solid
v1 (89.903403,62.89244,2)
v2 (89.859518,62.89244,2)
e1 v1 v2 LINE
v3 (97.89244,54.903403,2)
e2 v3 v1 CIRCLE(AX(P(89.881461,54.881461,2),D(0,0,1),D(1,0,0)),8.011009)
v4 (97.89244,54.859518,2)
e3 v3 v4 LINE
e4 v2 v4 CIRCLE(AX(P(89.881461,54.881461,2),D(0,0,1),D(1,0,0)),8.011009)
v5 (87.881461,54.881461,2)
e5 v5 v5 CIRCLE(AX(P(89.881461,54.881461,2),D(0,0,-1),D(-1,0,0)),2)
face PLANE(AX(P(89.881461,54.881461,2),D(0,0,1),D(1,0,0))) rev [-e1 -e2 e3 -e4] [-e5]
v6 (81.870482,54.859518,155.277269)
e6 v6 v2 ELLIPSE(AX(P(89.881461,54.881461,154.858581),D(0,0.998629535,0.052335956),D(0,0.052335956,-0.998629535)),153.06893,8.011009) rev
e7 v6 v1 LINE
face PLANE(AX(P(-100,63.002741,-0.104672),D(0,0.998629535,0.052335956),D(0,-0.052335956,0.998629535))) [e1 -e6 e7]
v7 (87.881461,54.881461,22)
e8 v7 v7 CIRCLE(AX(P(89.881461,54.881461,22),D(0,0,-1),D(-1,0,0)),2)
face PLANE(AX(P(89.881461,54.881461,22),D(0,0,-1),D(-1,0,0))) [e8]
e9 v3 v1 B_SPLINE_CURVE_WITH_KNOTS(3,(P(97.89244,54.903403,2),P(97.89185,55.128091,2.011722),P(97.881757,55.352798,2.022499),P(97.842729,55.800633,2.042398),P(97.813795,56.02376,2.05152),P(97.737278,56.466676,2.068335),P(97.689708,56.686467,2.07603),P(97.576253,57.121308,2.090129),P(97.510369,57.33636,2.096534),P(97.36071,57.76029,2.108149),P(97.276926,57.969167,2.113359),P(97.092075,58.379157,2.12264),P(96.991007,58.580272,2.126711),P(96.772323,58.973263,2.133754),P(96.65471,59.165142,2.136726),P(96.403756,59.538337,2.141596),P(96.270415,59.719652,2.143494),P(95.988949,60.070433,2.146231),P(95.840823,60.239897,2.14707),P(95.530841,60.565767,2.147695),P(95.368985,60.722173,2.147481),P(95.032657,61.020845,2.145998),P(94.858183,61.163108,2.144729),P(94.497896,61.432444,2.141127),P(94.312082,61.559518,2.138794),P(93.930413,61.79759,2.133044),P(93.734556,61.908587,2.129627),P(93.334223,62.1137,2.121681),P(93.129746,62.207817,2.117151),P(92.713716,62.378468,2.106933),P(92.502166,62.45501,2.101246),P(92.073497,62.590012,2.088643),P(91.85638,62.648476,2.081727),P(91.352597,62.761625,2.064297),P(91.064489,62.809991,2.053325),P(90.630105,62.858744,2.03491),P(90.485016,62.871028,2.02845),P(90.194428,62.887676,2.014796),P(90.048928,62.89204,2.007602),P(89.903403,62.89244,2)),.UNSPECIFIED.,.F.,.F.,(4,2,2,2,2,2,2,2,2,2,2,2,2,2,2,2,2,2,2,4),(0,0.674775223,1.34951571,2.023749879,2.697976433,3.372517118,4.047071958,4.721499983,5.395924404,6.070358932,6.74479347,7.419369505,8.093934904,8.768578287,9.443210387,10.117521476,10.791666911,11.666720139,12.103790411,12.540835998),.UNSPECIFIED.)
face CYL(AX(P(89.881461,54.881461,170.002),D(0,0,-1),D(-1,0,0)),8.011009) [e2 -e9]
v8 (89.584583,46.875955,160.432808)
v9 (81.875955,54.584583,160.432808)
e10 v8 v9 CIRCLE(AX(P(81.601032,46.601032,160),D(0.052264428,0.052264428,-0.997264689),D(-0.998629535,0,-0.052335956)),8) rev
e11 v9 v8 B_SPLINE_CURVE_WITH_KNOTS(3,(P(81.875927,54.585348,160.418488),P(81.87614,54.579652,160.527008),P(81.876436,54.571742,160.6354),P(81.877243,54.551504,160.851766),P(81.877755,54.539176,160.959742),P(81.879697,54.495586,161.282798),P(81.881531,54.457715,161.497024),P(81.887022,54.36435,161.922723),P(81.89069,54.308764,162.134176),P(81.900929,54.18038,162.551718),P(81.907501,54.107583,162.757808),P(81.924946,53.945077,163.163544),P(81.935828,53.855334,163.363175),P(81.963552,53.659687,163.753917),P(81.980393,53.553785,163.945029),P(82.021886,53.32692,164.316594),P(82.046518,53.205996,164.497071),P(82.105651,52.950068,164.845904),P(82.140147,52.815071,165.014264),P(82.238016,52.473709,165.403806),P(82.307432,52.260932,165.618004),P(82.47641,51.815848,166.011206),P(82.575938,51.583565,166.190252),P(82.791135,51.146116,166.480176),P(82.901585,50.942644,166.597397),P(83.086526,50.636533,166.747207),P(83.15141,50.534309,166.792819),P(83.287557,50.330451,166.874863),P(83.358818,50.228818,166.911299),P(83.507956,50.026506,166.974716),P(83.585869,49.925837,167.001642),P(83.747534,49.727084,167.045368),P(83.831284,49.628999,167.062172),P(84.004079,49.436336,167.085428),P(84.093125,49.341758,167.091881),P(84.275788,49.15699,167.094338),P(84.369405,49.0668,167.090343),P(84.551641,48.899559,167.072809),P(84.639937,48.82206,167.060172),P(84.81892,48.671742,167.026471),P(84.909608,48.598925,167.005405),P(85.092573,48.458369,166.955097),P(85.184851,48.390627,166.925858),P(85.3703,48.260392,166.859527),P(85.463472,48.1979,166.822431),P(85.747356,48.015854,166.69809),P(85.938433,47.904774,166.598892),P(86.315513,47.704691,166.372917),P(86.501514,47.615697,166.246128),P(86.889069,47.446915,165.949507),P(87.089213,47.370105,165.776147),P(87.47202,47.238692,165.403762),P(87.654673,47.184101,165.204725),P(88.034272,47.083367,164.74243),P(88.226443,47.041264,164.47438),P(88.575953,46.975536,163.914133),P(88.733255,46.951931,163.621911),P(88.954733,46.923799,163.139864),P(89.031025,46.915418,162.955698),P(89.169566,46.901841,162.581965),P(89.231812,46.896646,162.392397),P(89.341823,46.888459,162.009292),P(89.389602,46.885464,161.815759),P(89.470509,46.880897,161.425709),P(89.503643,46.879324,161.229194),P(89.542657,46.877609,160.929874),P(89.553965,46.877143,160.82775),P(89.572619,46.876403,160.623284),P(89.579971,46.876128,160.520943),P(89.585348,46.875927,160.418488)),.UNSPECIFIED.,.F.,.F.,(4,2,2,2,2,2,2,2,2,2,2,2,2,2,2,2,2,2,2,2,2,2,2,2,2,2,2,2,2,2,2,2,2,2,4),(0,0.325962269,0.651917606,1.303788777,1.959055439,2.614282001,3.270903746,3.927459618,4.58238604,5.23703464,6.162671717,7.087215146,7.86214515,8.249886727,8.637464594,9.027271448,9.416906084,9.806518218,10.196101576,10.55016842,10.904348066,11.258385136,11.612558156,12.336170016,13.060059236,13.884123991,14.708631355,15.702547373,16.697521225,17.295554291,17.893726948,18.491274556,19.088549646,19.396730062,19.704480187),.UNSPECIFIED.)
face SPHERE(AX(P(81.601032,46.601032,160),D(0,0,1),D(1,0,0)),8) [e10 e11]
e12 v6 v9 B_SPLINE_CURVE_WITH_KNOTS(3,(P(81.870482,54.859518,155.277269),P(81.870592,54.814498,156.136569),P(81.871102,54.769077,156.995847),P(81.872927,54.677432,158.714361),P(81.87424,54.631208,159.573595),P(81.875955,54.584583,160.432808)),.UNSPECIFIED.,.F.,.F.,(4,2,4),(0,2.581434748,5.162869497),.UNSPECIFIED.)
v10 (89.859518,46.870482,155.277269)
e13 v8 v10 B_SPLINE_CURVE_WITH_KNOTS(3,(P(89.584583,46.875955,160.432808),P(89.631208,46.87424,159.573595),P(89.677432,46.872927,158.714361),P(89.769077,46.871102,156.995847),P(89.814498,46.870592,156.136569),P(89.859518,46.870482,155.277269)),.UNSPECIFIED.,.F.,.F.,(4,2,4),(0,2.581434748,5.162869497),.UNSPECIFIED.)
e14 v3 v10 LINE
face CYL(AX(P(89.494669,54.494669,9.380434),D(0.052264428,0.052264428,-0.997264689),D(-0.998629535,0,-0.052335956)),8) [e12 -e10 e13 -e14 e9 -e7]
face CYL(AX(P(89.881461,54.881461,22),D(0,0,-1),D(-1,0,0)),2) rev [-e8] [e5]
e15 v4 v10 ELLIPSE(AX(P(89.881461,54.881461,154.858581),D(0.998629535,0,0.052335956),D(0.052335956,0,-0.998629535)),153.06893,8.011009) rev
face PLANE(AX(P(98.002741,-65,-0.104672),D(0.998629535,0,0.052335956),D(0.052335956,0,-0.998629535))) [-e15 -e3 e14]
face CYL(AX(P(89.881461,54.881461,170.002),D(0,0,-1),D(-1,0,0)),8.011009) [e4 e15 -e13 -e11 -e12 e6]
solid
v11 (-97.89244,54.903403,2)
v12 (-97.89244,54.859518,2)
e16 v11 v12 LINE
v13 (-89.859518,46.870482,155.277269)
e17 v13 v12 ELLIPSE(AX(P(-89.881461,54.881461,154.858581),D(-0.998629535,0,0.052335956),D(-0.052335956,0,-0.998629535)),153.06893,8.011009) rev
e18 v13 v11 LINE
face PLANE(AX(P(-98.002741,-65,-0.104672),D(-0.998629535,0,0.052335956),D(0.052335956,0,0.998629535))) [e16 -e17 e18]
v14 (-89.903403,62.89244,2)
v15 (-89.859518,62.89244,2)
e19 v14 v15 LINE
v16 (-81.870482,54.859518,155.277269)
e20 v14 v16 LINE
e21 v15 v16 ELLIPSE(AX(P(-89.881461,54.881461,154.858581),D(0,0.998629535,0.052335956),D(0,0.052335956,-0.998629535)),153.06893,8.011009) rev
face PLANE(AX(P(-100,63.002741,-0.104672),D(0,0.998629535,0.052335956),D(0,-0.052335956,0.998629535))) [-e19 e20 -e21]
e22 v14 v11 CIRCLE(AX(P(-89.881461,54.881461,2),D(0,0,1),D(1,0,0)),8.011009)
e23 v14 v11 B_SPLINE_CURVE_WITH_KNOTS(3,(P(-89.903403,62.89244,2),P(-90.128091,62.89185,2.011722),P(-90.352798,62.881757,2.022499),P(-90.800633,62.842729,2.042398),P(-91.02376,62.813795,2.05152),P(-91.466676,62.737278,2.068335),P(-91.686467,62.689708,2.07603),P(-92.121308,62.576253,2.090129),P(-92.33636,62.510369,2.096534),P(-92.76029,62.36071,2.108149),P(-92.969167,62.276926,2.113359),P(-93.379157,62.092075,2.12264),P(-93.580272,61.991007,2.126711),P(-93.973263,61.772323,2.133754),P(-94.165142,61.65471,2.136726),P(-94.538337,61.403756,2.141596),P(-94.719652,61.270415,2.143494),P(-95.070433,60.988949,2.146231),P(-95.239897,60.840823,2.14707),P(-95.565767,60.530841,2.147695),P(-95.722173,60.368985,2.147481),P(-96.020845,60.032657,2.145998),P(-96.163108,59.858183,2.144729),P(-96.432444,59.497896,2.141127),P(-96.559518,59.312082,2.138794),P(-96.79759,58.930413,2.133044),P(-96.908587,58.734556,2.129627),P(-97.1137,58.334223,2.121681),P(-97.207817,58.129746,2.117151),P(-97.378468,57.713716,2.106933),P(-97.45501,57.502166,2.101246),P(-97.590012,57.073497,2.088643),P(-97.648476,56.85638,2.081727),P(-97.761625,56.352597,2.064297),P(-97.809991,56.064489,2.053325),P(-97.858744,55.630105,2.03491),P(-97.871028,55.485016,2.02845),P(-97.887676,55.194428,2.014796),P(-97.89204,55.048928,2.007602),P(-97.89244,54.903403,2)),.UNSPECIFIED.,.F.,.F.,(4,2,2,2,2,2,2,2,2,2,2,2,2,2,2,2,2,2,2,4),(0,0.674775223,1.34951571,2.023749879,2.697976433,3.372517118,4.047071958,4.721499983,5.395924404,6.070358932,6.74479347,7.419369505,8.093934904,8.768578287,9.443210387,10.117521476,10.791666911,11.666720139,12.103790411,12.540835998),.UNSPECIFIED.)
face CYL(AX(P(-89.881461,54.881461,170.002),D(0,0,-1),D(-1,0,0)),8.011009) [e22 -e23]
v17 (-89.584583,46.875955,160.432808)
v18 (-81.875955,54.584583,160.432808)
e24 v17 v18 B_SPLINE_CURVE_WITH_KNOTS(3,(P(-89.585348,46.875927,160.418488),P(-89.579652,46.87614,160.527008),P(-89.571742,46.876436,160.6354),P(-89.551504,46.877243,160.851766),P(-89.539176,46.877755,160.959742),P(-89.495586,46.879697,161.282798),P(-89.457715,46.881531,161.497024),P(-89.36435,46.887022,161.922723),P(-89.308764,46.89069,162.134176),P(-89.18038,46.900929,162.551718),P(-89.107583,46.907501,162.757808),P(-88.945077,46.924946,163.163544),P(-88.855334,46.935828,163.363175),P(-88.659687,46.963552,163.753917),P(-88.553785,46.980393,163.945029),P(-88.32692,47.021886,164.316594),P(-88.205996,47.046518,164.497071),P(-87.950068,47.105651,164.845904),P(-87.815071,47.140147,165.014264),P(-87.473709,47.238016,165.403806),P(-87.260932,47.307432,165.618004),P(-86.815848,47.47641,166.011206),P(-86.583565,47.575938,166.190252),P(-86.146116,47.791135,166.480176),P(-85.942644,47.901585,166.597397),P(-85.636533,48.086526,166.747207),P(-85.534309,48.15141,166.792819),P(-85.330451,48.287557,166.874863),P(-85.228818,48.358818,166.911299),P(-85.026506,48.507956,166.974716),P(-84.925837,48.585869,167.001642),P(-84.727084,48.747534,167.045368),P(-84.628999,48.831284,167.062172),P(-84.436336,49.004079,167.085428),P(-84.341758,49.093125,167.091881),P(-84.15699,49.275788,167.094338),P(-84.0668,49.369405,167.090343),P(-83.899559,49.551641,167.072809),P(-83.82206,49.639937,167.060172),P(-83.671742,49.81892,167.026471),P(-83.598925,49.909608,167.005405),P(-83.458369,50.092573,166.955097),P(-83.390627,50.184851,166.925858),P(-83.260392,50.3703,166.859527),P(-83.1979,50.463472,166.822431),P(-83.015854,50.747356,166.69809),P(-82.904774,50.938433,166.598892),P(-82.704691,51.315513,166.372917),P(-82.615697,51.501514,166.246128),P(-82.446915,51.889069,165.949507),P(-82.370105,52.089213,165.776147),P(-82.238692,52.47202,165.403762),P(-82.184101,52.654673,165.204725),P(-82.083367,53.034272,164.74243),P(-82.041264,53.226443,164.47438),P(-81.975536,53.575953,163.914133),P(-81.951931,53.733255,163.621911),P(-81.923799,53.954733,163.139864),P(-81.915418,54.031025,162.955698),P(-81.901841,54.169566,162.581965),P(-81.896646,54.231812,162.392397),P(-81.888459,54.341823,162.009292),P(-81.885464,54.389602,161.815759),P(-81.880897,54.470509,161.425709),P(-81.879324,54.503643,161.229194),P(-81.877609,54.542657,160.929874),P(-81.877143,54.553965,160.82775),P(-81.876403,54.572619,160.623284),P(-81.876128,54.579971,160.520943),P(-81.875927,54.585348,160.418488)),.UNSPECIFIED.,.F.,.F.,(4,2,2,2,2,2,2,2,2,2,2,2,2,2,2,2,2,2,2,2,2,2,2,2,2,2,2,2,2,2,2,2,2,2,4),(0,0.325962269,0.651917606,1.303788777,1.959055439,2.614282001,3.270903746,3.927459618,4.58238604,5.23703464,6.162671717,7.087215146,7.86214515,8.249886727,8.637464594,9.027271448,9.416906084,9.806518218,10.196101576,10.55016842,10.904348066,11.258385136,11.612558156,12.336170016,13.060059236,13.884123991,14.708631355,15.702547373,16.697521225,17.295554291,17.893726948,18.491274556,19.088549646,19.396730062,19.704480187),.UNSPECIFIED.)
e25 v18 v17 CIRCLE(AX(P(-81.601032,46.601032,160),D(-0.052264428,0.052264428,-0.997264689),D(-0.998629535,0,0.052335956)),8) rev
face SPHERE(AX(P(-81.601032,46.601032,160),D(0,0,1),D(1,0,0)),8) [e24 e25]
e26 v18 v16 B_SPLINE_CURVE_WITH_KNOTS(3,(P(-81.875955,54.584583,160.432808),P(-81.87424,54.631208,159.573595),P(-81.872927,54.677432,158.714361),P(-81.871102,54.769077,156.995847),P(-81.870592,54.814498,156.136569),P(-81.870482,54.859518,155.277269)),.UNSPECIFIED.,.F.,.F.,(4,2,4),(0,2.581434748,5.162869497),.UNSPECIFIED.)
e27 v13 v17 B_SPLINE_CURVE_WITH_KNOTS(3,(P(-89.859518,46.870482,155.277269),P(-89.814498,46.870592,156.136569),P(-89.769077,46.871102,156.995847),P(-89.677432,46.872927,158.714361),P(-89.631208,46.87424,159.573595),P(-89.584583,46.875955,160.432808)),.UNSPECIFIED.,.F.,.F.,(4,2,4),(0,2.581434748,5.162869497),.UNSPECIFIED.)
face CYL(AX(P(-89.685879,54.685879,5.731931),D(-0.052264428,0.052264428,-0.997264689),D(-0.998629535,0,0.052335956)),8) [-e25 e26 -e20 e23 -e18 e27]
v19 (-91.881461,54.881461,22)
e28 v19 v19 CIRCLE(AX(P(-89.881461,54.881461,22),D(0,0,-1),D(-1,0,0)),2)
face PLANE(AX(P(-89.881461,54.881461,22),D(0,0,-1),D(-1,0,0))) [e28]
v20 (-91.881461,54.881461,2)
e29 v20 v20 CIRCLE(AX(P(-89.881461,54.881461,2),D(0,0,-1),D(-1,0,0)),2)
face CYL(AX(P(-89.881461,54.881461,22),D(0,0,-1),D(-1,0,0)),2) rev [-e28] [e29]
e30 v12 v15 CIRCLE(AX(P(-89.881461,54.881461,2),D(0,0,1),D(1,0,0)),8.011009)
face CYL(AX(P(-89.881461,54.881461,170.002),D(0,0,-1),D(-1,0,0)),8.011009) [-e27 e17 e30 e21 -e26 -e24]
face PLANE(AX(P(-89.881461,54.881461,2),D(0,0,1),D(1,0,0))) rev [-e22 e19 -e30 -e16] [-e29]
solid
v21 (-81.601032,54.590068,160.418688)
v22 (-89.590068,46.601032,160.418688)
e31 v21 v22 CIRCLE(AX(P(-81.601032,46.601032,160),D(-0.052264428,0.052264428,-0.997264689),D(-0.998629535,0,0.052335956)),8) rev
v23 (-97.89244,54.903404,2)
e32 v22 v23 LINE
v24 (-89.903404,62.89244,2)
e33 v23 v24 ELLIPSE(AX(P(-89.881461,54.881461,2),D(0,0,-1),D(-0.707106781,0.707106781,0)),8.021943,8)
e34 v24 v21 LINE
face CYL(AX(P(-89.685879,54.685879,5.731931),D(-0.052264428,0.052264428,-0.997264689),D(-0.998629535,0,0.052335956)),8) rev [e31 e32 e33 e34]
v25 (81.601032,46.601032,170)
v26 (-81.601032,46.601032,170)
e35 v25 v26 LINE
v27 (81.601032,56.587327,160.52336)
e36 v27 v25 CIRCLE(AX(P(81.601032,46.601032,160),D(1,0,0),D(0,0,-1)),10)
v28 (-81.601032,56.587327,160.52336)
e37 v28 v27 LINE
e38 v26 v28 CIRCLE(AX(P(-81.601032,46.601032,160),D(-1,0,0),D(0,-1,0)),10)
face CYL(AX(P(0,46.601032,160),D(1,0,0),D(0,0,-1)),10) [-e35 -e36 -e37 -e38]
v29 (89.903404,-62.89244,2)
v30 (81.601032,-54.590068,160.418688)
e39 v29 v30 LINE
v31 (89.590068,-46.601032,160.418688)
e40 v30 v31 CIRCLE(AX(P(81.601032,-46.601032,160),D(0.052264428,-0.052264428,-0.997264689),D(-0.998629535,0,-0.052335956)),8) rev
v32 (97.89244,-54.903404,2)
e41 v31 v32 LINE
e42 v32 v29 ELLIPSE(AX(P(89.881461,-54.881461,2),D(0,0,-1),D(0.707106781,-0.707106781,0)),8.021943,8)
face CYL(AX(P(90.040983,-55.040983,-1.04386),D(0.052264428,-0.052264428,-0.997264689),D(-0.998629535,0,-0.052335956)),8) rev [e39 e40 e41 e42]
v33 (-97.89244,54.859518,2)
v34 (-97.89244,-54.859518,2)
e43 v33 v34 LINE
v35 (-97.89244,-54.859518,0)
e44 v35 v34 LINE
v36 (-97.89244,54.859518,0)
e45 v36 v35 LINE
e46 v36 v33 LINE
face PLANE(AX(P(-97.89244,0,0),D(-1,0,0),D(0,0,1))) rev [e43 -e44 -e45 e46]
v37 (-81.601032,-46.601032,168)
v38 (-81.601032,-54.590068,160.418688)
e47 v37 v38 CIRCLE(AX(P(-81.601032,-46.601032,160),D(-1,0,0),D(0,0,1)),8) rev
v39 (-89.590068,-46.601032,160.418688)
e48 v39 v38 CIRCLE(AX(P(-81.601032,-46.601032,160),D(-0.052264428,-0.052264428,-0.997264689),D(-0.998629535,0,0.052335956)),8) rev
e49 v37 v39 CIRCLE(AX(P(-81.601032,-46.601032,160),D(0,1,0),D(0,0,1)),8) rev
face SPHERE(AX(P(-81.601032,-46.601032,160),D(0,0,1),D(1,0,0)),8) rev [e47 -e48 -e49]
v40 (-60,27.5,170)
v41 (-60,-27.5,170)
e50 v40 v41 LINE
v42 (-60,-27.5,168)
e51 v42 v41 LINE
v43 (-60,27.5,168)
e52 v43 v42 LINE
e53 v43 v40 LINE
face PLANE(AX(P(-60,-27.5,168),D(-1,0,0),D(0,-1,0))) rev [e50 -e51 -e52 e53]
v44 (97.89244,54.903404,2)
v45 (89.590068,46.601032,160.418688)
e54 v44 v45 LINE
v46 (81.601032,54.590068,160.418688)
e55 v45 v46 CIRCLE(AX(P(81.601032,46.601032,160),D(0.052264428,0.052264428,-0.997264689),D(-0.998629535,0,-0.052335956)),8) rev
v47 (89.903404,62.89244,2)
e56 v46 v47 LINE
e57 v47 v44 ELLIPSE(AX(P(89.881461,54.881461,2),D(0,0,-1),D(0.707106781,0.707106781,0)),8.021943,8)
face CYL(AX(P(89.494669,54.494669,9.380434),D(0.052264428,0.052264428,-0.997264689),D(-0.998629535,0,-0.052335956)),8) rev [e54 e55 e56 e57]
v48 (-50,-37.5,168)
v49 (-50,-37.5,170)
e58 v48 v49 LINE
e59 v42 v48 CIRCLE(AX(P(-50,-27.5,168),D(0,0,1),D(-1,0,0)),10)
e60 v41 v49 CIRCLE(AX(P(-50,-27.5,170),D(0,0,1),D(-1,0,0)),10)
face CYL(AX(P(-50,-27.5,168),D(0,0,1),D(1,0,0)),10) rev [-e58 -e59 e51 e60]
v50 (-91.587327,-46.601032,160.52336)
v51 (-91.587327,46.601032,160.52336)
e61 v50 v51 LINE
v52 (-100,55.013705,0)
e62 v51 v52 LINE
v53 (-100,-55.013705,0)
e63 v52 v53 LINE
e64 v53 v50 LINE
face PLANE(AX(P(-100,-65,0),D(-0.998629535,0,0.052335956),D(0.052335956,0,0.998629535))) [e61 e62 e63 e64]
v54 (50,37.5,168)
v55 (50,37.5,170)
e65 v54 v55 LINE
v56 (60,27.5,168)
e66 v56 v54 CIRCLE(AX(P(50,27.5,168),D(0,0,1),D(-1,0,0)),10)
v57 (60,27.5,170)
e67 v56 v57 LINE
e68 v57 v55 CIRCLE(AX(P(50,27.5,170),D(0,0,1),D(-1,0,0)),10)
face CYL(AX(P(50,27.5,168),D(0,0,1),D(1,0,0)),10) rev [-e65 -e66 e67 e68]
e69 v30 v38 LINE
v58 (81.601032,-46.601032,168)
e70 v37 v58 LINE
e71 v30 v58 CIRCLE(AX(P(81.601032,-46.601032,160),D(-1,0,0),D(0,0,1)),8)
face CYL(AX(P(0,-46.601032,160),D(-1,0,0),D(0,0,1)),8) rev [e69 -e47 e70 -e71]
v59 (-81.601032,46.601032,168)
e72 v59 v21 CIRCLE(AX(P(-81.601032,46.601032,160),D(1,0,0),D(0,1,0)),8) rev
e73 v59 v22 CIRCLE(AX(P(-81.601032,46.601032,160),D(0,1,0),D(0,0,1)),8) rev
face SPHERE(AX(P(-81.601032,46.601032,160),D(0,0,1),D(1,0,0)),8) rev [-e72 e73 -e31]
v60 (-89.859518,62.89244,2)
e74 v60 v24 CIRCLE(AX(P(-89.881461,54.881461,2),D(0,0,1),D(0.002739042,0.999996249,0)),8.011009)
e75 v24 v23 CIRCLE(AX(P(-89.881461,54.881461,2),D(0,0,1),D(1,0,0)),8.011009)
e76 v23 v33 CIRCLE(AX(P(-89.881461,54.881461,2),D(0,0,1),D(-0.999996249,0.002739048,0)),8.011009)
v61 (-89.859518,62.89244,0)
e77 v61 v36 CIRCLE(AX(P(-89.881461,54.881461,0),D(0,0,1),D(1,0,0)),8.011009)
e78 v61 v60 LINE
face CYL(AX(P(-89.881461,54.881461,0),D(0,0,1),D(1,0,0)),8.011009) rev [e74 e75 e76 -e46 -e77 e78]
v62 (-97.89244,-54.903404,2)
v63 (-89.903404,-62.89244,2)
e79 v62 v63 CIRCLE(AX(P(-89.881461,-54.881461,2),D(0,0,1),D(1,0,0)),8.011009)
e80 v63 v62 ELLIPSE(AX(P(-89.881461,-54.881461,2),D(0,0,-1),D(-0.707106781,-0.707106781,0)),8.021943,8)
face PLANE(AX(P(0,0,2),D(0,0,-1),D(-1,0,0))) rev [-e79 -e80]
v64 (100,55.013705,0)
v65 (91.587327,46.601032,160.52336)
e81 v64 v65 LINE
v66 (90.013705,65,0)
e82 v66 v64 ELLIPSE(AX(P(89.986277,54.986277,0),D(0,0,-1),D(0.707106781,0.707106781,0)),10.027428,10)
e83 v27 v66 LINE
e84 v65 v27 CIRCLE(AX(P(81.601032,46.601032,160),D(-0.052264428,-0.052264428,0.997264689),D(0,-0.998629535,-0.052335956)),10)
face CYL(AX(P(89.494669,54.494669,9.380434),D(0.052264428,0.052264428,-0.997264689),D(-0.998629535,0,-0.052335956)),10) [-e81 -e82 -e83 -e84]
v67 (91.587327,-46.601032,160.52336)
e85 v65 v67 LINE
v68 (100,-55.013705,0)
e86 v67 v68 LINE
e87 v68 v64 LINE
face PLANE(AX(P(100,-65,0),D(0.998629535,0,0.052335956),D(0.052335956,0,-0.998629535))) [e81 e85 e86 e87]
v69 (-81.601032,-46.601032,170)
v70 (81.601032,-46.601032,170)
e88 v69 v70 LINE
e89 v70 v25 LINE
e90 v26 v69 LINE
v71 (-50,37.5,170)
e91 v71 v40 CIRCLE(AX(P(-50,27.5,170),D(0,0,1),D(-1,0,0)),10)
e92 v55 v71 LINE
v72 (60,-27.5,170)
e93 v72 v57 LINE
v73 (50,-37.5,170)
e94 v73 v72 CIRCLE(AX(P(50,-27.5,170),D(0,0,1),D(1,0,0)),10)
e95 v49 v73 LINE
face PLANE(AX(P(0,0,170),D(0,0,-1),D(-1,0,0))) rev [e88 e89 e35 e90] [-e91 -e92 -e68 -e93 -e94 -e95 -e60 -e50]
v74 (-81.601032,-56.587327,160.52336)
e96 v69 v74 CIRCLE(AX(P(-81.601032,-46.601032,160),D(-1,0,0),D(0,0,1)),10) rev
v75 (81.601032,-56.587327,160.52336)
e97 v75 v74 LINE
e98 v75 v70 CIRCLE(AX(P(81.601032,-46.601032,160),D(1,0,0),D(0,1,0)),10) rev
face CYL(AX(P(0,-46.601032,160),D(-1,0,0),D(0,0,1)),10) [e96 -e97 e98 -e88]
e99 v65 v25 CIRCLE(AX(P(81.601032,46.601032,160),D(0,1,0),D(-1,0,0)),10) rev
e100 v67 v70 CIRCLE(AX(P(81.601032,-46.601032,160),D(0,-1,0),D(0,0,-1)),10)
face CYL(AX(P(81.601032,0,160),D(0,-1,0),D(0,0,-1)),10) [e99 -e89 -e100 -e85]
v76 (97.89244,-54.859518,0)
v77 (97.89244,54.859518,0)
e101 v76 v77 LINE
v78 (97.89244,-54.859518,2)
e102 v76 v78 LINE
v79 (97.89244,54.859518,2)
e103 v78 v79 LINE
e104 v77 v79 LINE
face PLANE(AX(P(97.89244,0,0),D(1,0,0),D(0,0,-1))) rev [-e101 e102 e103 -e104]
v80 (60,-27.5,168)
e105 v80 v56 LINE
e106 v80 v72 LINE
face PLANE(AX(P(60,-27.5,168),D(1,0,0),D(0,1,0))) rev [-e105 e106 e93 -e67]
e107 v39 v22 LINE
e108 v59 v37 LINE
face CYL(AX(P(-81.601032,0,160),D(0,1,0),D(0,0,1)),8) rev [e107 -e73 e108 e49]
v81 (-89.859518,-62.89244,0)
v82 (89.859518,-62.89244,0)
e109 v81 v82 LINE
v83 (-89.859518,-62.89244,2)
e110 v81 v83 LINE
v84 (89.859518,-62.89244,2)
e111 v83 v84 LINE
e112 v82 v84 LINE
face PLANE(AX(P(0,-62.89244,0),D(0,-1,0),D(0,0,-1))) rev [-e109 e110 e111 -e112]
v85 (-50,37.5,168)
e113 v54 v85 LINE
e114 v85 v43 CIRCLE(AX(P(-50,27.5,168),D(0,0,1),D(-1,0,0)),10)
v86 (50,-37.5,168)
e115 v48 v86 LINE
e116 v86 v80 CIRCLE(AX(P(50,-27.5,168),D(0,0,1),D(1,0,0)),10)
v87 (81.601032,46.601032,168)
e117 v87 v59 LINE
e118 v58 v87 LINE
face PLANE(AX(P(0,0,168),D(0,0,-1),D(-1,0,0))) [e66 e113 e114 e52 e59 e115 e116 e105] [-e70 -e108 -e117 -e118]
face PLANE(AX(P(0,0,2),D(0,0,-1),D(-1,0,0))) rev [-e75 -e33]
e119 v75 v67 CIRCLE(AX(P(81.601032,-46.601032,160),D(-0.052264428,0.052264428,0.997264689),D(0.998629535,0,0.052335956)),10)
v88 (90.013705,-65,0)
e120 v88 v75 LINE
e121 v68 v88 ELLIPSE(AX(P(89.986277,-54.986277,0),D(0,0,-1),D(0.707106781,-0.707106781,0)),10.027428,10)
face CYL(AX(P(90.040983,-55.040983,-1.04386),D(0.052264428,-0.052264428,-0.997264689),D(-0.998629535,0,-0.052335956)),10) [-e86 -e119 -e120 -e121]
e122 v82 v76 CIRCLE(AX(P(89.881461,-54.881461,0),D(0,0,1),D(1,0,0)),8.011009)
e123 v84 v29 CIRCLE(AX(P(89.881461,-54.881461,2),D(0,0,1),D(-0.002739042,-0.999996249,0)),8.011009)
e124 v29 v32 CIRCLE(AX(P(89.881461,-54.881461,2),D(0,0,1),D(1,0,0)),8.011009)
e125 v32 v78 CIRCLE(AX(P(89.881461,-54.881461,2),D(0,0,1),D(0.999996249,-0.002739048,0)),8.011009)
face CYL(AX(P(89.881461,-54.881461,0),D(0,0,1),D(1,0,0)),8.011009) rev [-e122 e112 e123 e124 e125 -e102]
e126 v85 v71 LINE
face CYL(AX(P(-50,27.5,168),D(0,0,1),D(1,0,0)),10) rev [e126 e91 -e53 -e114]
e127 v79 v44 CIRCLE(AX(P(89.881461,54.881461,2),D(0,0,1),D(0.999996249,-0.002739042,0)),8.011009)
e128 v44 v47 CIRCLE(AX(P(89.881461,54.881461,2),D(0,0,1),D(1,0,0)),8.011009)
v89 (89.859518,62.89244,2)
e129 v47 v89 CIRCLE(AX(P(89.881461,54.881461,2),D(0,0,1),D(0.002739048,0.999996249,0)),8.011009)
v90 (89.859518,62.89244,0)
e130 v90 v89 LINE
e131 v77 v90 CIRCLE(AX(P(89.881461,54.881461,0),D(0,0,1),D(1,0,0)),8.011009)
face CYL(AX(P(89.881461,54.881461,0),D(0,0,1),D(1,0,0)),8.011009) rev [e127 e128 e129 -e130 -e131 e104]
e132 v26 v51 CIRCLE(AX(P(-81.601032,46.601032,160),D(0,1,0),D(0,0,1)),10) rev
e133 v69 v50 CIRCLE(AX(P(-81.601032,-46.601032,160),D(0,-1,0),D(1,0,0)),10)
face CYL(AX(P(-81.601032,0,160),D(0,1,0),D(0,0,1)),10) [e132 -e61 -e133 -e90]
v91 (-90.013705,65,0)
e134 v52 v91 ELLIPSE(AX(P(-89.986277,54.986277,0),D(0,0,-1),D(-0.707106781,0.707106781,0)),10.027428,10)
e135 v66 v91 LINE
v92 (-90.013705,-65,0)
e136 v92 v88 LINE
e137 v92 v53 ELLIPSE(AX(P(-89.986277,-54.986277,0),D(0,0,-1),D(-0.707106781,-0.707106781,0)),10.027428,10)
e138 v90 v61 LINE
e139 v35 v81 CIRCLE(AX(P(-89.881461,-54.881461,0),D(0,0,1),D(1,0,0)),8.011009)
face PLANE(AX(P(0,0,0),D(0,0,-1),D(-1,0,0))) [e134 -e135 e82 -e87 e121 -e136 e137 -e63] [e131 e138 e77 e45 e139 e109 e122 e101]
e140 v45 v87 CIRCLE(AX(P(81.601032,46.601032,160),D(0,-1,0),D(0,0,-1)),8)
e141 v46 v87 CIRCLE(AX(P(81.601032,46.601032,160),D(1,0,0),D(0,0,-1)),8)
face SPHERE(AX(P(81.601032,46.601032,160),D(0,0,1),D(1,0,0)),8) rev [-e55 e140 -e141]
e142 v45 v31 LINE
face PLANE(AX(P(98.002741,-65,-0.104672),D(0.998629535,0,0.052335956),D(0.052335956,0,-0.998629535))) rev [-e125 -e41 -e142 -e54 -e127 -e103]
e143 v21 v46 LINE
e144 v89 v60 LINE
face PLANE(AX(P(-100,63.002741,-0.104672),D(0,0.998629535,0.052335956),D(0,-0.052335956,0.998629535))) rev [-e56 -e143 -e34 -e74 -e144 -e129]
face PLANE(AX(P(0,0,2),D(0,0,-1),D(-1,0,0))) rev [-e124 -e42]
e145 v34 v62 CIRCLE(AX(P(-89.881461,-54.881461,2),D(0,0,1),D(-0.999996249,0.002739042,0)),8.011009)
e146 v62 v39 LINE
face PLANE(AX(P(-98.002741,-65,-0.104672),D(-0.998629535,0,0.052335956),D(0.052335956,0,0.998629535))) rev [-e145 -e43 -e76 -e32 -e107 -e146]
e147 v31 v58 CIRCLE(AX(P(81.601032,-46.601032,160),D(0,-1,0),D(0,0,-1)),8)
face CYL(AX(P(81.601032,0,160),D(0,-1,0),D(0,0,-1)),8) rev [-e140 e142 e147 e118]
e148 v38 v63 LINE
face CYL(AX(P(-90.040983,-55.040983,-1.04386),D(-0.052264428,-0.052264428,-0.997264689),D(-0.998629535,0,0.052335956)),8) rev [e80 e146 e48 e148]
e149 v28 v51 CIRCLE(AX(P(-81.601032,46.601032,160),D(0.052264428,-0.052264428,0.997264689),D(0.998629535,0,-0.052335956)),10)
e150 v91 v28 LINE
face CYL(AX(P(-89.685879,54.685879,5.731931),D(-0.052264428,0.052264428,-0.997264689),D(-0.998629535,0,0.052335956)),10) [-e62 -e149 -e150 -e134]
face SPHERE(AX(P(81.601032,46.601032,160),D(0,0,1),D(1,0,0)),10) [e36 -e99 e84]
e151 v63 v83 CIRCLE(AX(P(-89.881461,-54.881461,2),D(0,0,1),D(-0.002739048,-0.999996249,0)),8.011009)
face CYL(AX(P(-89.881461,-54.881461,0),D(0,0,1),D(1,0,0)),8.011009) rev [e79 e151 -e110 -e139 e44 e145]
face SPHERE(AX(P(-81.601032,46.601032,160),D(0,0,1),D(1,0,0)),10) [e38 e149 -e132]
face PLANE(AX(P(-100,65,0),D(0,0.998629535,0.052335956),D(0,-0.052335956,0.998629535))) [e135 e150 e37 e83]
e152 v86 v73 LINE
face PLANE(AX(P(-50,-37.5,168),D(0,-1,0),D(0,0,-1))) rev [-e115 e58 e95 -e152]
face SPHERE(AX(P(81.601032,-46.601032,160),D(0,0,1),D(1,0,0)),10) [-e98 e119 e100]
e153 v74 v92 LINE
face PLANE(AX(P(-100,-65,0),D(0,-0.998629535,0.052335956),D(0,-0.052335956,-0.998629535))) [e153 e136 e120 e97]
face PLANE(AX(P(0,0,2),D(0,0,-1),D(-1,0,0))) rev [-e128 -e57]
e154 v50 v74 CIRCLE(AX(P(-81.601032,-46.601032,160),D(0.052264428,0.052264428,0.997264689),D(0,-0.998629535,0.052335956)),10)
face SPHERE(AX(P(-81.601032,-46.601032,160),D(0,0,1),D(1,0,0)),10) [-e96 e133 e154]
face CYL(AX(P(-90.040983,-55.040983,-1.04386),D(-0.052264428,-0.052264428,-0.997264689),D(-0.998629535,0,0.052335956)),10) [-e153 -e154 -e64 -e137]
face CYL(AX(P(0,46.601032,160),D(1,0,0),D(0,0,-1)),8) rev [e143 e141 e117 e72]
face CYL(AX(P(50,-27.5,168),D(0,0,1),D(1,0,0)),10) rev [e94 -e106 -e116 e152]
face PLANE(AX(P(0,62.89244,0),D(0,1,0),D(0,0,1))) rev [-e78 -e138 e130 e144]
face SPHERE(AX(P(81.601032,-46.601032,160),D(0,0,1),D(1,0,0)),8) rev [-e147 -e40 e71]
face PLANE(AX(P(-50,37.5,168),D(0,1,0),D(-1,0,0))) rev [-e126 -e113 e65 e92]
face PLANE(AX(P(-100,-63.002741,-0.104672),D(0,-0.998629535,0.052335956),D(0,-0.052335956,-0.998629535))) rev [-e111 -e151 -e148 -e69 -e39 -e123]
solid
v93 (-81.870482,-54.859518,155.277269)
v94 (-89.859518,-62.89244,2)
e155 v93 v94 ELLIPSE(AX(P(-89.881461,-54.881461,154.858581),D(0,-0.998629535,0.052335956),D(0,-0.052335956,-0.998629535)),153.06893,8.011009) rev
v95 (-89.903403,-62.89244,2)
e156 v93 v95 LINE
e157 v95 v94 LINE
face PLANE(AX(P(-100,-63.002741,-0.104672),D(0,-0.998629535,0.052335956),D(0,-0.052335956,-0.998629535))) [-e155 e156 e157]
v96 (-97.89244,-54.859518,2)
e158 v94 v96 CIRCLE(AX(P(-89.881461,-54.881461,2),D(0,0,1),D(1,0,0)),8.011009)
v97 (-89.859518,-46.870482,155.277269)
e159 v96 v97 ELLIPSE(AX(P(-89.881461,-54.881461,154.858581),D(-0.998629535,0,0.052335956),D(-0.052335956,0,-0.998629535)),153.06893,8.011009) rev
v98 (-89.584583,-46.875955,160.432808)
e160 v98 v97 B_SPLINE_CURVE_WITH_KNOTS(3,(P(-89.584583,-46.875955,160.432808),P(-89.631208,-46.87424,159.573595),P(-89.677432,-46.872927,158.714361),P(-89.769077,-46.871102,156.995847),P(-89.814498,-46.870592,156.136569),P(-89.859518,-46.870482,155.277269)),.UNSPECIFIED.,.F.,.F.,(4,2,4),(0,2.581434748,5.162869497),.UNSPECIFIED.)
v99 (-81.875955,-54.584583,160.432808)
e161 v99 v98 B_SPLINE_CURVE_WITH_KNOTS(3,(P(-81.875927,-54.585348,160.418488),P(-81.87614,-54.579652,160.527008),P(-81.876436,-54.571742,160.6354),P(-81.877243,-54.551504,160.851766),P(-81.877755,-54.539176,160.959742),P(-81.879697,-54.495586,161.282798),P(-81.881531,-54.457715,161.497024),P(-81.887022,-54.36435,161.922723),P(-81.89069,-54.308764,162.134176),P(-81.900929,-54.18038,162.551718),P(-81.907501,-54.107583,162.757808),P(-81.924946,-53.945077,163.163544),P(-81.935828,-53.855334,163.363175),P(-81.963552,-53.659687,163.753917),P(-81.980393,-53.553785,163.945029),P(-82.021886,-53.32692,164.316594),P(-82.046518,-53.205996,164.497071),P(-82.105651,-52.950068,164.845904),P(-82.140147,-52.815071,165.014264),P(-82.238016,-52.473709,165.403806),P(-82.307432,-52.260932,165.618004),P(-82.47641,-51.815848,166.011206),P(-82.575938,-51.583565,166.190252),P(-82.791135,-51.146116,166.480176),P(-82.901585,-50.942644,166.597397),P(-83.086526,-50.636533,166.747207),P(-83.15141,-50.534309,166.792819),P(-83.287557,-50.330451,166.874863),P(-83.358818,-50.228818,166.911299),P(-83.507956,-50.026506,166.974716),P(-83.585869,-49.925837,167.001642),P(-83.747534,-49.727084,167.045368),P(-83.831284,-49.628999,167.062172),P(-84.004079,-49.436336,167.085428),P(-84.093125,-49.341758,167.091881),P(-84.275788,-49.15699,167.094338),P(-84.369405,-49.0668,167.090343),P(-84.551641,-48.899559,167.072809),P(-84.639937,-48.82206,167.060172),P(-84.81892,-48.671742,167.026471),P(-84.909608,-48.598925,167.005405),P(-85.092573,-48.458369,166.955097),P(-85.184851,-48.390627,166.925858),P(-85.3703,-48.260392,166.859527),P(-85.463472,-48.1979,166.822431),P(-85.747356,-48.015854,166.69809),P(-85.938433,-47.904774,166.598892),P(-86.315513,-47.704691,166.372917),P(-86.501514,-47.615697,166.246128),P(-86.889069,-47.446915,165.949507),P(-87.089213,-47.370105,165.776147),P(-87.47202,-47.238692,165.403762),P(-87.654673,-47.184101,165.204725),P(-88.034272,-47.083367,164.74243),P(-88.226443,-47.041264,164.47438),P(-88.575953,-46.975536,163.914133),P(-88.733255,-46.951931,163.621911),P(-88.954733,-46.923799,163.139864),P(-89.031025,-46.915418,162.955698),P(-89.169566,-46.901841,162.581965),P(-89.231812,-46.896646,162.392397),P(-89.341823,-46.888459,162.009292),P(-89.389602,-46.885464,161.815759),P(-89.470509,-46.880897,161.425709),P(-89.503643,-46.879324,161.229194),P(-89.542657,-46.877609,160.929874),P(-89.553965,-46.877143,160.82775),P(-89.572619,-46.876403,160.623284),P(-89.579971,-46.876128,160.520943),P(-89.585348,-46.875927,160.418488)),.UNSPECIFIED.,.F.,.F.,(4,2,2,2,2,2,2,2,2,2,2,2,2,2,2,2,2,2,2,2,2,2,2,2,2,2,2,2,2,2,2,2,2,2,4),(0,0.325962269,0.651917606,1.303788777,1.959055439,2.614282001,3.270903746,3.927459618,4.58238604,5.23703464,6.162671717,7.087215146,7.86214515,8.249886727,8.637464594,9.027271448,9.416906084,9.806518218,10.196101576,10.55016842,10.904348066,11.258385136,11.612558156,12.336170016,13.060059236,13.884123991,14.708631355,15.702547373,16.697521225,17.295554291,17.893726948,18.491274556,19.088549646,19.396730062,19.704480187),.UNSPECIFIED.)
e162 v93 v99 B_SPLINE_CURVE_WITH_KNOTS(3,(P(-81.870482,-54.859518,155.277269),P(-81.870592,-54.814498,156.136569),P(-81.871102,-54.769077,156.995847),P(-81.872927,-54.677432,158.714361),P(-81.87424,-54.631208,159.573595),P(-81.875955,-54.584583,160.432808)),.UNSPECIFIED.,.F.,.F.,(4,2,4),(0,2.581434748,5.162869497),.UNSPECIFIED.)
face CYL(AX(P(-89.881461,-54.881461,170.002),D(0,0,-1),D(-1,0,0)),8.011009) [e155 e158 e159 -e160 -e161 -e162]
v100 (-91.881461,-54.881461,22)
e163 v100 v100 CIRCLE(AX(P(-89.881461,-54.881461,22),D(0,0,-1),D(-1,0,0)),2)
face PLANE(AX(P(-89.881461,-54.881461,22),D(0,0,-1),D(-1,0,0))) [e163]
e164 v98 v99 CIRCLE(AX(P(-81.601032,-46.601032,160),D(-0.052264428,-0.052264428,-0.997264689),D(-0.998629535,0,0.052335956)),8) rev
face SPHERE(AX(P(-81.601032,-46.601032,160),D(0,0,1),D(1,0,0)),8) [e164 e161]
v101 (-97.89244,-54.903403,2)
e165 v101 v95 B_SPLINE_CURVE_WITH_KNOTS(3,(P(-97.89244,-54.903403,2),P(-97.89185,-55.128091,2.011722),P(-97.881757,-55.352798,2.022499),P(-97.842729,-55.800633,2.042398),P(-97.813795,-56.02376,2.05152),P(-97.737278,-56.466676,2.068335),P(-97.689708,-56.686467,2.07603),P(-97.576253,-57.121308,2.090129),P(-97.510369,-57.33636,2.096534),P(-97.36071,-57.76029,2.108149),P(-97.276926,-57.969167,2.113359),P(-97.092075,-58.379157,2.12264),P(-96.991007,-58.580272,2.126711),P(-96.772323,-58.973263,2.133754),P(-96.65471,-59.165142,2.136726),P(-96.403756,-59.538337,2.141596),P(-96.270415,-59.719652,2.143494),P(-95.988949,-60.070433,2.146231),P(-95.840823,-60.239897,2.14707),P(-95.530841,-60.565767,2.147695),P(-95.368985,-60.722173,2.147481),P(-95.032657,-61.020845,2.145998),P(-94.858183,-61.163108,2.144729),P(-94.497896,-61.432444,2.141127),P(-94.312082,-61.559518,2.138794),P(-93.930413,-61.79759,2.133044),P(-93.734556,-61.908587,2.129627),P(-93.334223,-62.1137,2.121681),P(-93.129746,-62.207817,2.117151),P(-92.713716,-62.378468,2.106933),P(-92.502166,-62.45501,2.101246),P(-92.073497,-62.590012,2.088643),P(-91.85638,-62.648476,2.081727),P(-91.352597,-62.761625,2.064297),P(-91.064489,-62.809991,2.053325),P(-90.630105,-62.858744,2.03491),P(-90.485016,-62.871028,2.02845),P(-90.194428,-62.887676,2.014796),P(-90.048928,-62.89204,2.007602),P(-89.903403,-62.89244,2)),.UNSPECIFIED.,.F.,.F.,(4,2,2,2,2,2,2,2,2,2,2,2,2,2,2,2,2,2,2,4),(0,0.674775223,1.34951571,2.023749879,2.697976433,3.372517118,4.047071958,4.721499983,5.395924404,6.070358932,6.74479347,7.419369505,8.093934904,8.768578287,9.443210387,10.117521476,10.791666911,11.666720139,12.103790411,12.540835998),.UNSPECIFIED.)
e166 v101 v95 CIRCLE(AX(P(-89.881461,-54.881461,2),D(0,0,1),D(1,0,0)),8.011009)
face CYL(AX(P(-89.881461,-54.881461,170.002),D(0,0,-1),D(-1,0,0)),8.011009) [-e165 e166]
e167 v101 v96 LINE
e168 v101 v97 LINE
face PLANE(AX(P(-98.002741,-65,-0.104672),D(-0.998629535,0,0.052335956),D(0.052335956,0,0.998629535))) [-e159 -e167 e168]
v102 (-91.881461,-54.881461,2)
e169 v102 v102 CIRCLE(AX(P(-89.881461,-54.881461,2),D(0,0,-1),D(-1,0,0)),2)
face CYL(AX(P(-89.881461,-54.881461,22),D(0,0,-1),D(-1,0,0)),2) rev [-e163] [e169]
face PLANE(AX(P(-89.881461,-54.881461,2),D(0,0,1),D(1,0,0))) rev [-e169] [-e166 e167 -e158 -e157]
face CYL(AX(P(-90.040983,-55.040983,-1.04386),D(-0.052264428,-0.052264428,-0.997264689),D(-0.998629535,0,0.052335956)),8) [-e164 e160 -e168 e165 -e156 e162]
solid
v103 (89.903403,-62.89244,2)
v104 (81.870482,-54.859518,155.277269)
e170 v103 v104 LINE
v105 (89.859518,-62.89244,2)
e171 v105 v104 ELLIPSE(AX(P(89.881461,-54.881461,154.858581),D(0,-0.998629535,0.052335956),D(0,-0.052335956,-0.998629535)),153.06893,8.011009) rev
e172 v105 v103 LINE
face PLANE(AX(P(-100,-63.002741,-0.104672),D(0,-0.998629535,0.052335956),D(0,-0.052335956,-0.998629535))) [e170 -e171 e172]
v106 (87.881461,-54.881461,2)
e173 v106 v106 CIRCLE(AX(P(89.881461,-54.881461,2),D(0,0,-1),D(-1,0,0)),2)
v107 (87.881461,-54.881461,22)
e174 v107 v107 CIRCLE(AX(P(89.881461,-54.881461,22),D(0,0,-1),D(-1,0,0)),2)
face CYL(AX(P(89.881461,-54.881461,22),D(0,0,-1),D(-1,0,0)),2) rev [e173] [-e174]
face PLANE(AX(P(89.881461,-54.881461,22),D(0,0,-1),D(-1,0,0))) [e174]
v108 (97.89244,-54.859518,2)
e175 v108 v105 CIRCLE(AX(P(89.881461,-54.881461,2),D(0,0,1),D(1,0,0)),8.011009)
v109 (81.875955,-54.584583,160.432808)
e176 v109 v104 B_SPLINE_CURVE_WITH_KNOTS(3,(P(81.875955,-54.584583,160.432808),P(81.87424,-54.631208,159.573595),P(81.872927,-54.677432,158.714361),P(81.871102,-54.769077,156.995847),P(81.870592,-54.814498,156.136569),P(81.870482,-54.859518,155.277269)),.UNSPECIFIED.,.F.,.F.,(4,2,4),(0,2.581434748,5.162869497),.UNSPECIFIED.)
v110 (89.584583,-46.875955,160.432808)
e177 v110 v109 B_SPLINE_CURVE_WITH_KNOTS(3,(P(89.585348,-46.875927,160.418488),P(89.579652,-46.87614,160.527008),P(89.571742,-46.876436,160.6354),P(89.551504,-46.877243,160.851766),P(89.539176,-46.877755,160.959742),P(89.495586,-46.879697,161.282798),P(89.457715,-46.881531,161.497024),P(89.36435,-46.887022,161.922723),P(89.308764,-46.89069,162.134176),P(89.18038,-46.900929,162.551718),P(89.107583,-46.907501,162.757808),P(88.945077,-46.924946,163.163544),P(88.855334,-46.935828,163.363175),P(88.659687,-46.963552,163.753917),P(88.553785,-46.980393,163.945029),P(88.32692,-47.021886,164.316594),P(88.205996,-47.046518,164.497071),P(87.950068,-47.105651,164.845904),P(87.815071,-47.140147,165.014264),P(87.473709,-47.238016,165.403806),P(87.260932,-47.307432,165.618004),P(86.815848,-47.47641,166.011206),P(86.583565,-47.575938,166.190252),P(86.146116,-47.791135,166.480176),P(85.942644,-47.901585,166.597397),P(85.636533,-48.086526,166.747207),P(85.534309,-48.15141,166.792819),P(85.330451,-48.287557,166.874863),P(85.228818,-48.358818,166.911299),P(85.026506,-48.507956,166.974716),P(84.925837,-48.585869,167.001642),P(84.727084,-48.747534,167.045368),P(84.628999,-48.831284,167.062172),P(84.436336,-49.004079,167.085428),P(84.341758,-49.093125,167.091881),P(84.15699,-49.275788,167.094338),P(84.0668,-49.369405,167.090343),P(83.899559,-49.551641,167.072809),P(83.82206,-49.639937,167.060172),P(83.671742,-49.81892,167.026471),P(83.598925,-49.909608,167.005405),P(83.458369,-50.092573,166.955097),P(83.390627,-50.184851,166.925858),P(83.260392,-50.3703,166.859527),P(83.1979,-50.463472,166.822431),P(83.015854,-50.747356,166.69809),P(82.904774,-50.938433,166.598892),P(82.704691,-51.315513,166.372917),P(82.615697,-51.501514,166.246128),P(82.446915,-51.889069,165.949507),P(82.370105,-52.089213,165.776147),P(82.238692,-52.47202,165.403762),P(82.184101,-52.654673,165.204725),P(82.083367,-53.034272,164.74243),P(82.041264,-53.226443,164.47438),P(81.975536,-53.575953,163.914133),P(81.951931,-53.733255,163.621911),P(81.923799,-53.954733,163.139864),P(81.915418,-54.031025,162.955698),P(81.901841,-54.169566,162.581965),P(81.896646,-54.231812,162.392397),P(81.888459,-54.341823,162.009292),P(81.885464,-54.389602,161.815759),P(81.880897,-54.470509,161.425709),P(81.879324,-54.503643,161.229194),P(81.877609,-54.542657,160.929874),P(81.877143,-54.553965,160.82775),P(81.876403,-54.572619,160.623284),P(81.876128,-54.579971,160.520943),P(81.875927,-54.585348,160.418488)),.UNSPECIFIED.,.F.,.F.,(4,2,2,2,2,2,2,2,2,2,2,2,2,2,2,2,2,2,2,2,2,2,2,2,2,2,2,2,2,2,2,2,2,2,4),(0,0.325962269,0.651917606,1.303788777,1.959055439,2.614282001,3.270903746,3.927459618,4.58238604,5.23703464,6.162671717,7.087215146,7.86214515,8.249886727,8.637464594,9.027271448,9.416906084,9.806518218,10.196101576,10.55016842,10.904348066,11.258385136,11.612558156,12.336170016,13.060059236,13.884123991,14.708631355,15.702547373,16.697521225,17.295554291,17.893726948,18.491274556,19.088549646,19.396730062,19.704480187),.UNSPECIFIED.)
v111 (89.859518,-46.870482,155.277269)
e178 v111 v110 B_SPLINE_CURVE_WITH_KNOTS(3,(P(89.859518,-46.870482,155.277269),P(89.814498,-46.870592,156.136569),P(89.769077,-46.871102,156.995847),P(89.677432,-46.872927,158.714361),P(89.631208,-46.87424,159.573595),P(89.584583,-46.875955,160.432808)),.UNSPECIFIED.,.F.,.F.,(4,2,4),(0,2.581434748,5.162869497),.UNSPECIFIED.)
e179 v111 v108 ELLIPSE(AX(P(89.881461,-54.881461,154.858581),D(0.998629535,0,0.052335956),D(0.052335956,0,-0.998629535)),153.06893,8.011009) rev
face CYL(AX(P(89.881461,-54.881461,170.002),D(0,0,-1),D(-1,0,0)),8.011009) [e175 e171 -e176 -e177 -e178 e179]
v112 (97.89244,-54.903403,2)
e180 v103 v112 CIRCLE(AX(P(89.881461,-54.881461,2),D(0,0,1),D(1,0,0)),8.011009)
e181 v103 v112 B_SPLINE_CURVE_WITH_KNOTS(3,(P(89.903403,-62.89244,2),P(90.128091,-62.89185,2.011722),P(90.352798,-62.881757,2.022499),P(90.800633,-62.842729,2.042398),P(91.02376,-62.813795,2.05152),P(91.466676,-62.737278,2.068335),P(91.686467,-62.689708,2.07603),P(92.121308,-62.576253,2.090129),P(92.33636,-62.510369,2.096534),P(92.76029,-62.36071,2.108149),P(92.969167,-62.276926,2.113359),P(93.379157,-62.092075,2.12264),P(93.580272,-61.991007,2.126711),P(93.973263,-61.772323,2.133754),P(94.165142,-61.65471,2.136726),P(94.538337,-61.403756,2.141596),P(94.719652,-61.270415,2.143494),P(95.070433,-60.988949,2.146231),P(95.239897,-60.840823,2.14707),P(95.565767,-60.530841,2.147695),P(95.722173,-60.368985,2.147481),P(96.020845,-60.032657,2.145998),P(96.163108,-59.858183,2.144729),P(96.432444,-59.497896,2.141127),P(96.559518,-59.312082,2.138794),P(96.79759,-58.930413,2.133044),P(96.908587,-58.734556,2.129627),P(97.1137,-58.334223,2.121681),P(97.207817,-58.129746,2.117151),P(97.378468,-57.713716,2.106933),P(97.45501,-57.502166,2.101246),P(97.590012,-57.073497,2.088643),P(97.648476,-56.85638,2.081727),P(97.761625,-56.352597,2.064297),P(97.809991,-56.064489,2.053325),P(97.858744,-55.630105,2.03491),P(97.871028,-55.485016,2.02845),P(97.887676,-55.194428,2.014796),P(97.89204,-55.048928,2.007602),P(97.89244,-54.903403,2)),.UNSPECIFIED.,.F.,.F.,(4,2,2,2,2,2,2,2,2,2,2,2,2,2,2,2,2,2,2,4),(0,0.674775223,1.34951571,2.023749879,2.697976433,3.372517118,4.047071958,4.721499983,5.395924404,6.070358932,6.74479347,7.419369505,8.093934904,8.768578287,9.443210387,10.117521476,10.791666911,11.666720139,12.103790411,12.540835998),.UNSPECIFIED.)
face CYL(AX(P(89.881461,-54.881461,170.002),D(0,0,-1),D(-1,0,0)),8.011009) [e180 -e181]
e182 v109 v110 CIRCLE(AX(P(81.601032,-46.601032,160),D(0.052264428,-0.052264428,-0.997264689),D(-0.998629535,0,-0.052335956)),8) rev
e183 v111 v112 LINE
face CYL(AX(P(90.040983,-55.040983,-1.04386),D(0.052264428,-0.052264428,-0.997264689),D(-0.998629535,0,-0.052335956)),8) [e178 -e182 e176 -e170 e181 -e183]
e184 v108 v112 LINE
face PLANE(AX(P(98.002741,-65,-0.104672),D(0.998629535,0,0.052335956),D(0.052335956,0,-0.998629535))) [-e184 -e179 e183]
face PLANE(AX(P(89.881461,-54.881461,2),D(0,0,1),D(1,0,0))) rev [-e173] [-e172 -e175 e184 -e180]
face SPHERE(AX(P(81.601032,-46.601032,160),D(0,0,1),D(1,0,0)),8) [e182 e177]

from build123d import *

# Parameters (mm, degrees)
SKIZZE1_W                       = 200
SKIZZE1_H                       = 130
AUFSATZ_LINEAR_AUSTRAGEN1_DEPTH = 170
AUFSATZ_LINEAR_AUSTRAGEN1_TAPER = 3
VERRUNDUNG1_R                   = 10
WANDUNG3_T                      = 2
SCHNITT_LINEAR_AUSTRAGEN1_DEPTH = 2
AUFSATZ_LINEAR_AUSTRAGEN2_REACH = 208.032
SKIZZE4_R                       = 8.011008819
SCHNITT_LINEAR_START            = -2
SCHNITT_LINEAR_AUSTRAGEN2_DEPTH = 2
SKIZZE4_5_R                     = 8.011008819
SCHNITT_LINEAR_AUSTRAGEN3_DEPTH = 2
SKIZZE7_R                       = 2
SCHNITT_LINEAR_AUSTRAGEN4_DEPTH = 20


# Read off the part's stored shape, not the designer's step: Schnitt-Linear austragen2
with BuildPart() as part:
    # Skizze1 → Aufsatz-Linear austragen1 (new body)
    with BuildSketch(Plane.XY):
        Rectangle(SKIZZE1_W, SKIZZE1_H)
    extrude(amount=AUFSATZ_LINEAR_AUSTRAGEN1_DEPTH, taper=AUFSATZ_LINEAR_AUSTRAGEN1_TAPER)

    # Verrundung1
    verrundung1_edges = [part.edges().sort_by_distance(p)[0] for p in [
        (-91.090677522, 0, 170),
        (0, -56.090677522, 170),
        (91.090677522, 0, 170),
        (95.545338761, -60.545338761, 85),
        (-95.545338761, -60.545338761, 85),
        (-95.545338761, 60.545338761, 85),
        (95.545338761, 60.545338761, 85),
        (0, 56.090677522, 170),
    ]]
    fillet(verrundung1_edges, radius=VERRUNDUNG1_R)

    # Wandung3 (no face opened: a closed hollow body)
    add(offset(amount=-WANDUNG3_T, mode=Mode.PRIVATE), mode=Mode.SUBTRACT)

    # Skizze2 → Schnitt-Linear austragen1 (cut)
    with BuildSketch(Plane.XY.offset(170)):
        with BuildLine():
            Line((-50, -37.5), (50, -37.5))
            ThreePointArc((50, -37.5), (57.071067812, -34.571067812), (60, -27.5))
            Line((60, -27.5), (60, 27.5))
            ThreePointArc((60, 27.5), (57.071067812, 34.571067812), (50, 37.5))
            Line((50, 37.5), (-50, 37.5))
            ThreePointArc((-50, 37.5), (-57.071067812, 34.571067812), (-60, 27.5))
            Line((-60, 27.5), (-60, -27.5))
            ThreePointArc((-60, -27.5), (-57.071067812, -34.571067812), (-50, -37.5))
        make_face()
    extrude(amount=-SCHNITT_LINEAR_AUSTRAGEN1_DEPTH, mode=Mode.SUBTRACT)


with BuildPart() as body_2:

    # Skizze4 → Aufsatz-Linear austragen2 (new, up to next)
    with BuildSketch(Plane.XY.offset(2), mode=Mode.PRIVATE) as aufsatz_linear_austragen2_sk1:
        with Locations((-89.881460981, 54.881460981)):
            Circle(SKIZZE4_R)
    aufsatz_linear_austragen2_tool1 = extrude(aufsatz_linear_austragen2_sk1.sketch, amount=AUFSATZ_LINEAR_AUSTRAGEN2_REACH, mode=Mode.PRIVATE) - part.part
    # Skizze4 → Aufsatz-Linear austragen2 (new, up to next)
    with BuildSketch(Plane.XY.offset(2), mode=Mode.PRIVATE) as aufsatz_linear_austragen2_sk2:
        with Locations((89.881460981, 54.881460981)):
            Circle(SKIZZE4_R)
    aufsatz_linear_austragen2_tool2 = extrude(aufsatz_linear_austragen2_sk2.sketch, amount=AUFSATZ_LINEAR_AUSTRAGEN2_REACH, mode=Mode.PRIVATE) - part.part
    # Skizze4 → Aufsatz-Linear austragen2 (new, up to next)
    with BuildSketch(Plane.XY.offset(2), mode=Mode.PRIVATE) as aufsatz_linear_austragen2_sk3:
        with Locations((89.881460981, -54.881460981)):
            Circle(SKIZZE4_R)
    aufsatz_linear_austragen2_tool3 = extrude(aufsatz_linear_austragen2_sk3.sketch, amount=AUFSATZ_LINEAR_AUSTRAGEN2_REACH, mode=Mode.PRIVATE) - part.part
    # Skizze4 → Aufsatz-Linear austragen2 (new, up to next)
    with BuildSketch(Plane.XY.offset(2), mode=Mode.PRIVATE) as aufsatz_linear_austragen2_sk4:
        with Locations((-89.881460981, -54.881460981)):
            Circle(SKIZZE4_R)
    aufsatz_linear_austragen2_tool4 = extrude(aufsatz_linear_austragen2_sk4.sketch, amount=AUFSATZ_LINEAR_AUSTRAGEN2_REACH, mode=Mode.PRIVATE) - part.part
    add(aufsatz_linear_austragen2_tool1.solids().sort_by_distance((-89.881461, 54.881461, 2))[0])
    add(aufsatz_linear_austragen2_tool2.solids().sort_by_distance((89.881461, 54.881461, 2))[0])
    add(aufsatz_linear_austragen2_tool3.solids().sort_by_distance((89.881461, -54.881461, 2))[0])
    add(aufsatz_linear_austragen2_tool4.solids().sort_by_distance((-89.881461, -54.881461, 2))[0])

    # Skizze7 → Schnitt-Linear austragen4 (cut)
    with BuildSketch(Plane(origin=(0, 0, 2), x_dir=(-1, 0, 0), z_dir=(0, 0, -1))):
        with Locations((-89.881460981, 54.881460981)):
            Circle(SKIZZE7_R)
        with Locations((89.881460981, 54.881460981)):
            Circle(SKIZZE7_R)
        with Locations((89.881460981, -54.881460981)):
            Circle(SKIZZE7_R)
        with Locations((-89.881460981, -54.881460981)):
            Circle(SKIZZE7_R)
    extrude(amount=-SCHNITT_LINEAR_AUSTRAGEN4_DEPTH, mode=Mode.SUBTRACT)


with BuildPart() as part_1:
    add(part.part)

    # Schnitt-Linear austragen2 outline → Schnitt-Linear austragen2 (cut)
    with BuildSketch(Plane.XY.offset(2).offset(SCHNITT_LINEAR_START)):
        with BuildLine():
            ThreePointArc((-97.892439749, -54.859518492), (-84.216822322, -49.216822322), (-89.859518492, -62.892439749))
            Line((-89.859518492, -62.892439749), (89.859518492, -62.892439749))
            ThreePointArc((89.859518492, -62.892439749), (84.216822322, -49.216822322), (97.892439749, -54.859518492))
            Line((97.892439749, -54.859518492), (97.892439749, 54.859518492))
            ThreePointArc((97.892439749, 54.859518492), (84.216822322, 49.216822322), (89.859518492, 62.892439749))
            Line((89.859518492, 62.892439749), (-89.859518492, 62.892439749))
            ThreePointArc((-89.859518492, 62.892439749), (-84.216822322, 49.216822322), (-97.892439749, 54.859518492))
            Line((-97.892439749, 54.859518492), (-97.892439749, -54.859518492))
        make_face()
    extrude(amount=SCHNITT_LINEAR_AUSTRAGEN2_DEPTH, mode=Mode.SUBTRACT)

    # Skizze4<5> → Schnitt-Linear austragen3 (cut)
    with BuildSketch(Plane.XY.offset(2).offset(SCHNITT_LINEAR_START)):
        with Locations((-89.881460981, 54.881460981)):
            Circle(SKIZZE4_5_R)
        with Locations((89.881460981, 54.881460981)):
            Circle(SKIZZE4_5_R)
        with Locations((89.881460981, -54.881460981)):
            Circle(SKIZZE4_5_R)
        with Locations((-89.881460981, -54.881460981)):
            Circle(SKIZZE4_5_R)
    extrude(amount=SCHNITT_LINEAR_AUSTRAGEN3_DEPTH, mode=Mode.SUBTRACT)


solid = Compound([body_2.part, part_1.part])
